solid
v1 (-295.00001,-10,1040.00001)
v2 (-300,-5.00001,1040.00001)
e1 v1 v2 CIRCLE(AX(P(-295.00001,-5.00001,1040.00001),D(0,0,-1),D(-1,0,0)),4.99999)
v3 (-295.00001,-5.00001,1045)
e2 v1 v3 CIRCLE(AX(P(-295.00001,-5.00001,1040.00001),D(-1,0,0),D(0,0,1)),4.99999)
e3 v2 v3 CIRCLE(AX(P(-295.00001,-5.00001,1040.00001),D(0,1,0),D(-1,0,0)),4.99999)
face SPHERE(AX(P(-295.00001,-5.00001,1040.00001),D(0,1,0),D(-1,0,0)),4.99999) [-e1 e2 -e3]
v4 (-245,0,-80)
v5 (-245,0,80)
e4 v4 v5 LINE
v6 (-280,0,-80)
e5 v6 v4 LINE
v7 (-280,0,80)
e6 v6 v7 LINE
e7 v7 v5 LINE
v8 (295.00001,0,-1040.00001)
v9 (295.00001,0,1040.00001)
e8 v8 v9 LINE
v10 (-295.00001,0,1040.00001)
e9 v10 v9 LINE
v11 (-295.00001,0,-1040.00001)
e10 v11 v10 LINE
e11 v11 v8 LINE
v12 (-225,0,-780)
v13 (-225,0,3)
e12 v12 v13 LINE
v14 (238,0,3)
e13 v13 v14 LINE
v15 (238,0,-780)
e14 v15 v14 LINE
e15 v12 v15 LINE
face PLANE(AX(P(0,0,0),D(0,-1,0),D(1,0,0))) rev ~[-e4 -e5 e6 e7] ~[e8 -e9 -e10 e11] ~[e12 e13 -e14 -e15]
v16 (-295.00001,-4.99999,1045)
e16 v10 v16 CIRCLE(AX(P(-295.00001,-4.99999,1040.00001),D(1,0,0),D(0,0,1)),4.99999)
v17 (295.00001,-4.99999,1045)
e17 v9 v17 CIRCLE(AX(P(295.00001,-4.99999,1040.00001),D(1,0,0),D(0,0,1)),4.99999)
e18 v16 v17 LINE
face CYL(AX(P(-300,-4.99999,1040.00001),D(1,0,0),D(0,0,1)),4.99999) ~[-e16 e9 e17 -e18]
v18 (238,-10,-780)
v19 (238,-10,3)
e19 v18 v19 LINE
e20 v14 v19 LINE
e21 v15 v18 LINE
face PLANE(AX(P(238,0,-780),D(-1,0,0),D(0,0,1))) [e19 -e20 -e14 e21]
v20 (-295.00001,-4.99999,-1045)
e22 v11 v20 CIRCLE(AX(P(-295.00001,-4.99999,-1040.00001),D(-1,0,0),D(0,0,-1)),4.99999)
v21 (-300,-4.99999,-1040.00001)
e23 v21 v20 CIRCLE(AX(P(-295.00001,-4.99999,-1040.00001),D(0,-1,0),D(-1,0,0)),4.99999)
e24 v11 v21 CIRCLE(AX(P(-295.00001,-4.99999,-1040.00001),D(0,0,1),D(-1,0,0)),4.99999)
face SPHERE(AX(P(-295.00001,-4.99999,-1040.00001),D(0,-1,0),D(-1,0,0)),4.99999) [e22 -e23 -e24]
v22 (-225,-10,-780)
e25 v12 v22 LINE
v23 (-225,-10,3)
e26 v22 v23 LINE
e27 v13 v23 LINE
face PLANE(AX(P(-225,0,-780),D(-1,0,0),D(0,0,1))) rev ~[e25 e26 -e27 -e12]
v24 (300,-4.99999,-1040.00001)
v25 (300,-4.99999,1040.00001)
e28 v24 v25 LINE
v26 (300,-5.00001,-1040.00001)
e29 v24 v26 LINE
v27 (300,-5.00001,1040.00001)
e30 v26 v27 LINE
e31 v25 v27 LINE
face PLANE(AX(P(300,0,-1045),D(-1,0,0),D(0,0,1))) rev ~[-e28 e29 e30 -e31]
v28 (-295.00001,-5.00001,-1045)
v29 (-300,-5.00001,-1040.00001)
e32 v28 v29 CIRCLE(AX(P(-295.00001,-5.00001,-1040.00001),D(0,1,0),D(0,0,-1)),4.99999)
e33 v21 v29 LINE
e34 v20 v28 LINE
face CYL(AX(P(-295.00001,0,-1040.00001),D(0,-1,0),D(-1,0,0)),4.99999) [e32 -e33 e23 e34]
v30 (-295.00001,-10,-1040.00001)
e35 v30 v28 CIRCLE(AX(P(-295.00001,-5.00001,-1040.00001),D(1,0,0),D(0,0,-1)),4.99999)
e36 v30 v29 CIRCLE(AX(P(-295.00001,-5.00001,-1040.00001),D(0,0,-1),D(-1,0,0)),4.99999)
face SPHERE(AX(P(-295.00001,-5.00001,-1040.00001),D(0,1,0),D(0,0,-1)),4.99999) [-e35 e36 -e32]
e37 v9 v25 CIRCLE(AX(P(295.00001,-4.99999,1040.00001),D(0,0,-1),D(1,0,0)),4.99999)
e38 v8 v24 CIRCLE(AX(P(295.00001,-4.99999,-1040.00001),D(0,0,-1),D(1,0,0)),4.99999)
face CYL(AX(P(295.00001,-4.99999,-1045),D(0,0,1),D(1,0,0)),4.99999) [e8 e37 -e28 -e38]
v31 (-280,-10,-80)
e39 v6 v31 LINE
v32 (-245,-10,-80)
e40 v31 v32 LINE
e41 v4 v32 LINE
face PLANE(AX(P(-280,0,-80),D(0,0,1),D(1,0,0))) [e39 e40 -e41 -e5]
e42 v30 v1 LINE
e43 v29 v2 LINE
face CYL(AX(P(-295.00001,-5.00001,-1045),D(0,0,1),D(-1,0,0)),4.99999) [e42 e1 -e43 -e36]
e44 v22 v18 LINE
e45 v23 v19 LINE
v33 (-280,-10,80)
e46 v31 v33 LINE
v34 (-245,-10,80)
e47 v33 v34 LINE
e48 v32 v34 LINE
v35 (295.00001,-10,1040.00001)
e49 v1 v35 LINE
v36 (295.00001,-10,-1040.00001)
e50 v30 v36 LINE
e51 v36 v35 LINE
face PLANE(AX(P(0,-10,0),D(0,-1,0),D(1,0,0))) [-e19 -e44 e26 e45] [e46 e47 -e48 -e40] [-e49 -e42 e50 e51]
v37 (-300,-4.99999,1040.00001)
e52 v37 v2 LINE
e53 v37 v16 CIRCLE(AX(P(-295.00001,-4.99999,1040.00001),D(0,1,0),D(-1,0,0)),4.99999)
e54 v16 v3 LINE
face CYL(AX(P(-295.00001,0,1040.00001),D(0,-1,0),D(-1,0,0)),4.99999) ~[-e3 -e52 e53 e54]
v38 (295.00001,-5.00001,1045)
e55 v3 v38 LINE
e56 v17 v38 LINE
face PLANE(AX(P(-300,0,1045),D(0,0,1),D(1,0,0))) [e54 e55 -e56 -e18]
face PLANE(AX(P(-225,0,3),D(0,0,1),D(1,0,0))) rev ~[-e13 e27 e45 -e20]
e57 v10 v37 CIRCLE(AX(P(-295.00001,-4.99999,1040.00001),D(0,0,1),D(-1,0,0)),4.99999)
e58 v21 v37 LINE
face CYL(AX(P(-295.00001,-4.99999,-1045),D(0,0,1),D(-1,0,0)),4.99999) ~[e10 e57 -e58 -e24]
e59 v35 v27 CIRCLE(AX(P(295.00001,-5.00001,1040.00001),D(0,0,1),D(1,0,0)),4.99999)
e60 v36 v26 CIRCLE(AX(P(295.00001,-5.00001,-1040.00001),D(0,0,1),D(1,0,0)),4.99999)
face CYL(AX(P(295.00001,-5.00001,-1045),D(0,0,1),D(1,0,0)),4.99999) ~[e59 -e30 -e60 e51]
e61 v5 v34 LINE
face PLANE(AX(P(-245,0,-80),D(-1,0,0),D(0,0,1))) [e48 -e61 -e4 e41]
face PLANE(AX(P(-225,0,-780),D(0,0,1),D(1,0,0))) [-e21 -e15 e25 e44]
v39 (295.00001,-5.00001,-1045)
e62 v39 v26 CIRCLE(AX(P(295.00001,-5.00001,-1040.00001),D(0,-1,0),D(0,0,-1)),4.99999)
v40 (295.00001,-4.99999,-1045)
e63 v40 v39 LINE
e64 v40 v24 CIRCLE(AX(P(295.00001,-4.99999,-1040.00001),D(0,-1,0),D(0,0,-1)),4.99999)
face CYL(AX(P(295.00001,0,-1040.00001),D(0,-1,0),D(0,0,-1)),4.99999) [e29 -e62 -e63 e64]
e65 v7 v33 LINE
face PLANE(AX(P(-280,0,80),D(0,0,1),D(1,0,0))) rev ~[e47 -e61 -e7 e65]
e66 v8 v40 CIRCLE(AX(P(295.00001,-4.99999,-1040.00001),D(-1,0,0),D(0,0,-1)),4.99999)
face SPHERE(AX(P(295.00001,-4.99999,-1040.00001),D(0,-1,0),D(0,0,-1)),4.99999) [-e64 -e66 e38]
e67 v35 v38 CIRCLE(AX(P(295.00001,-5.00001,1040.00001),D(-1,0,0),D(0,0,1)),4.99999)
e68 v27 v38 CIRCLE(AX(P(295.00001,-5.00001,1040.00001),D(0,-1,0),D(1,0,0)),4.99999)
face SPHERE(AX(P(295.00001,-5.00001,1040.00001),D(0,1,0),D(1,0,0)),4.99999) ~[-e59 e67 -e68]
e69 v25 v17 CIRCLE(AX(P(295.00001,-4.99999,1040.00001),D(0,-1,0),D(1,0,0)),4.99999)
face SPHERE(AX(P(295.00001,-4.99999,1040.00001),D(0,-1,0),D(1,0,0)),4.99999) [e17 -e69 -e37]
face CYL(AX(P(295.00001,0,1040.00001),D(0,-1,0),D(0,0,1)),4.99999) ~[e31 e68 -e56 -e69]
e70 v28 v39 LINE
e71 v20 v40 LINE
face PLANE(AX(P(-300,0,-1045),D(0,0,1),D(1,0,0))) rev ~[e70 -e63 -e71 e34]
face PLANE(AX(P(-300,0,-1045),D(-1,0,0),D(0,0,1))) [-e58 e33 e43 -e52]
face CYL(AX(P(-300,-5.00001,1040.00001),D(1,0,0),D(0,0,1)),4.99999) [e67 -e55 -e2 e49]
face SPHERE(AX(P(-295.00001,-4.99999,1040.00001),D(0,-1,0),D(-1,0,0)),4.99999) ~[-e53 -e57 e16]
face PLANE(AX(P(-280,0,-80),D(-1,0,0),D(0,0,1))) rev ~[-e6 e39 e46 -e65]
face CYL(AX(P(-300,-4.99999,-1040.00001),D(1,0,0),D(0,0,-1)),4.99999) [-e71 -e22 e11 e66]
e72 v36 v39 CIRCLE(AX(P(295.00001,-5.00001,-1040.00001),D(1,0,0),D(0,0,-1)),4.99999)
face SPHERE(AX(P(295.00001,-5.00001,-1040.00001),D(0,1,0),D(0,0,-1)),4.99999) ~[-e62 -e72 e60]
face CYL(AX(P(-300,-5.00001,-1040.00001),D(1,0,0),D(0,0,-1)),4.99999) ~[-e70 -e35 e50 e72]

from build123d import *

# Parameters (mm, degrees)
F0_W     = 600
F0_H     = 2090
F0_W_2   = 463
F0_H_2   = 783
F0_W_3   = 35
F0_H_3   = 160
F1_DEPTH = 10
F2_R     = 4.99999


# Not quite as in the source:
# - a fillet or chamfer is up to 0.001 mm smaller than in the source, because OpenCascade refuses the exact size


with BuildPart() as f1:
    # F0 (on Front) → F1 (new body)
    with BuildSketch(Plane.XZ):
        Rectangle(F0_W, F0_H)
        with Locations((6.5, -388.5)):
            Rectangle(F0_W_2, F0_H_2, mode=Mode.SUBTRACT)
        with Locations((-262.5, 0)):
            Rectangle(F0_W_3, F0_H_3, mode=Mode.SUBTRACT)
    extrude(amount=F1_DEPTH)

    # F2 (radius 5 in the source; OpenCascade refuses exactly that, so slightly less here)
    f2_edges = [f1.edges().sort_by_distance(p)[0] for p in [
        (300, -5, 1045),
        (-300, -5, 1045),
        (-300, -5, -1045),
        (300, -5, -1045),
        (0, -10, -1045),
        (-300, -10, 0),
        (-300, 0, 0),
        (0, 0, -1045),
        (300, 0, 0),
        (300, -10, 0),
        (0, -10, 1045),
        (0, 0, 1045),
    ]]
    fillet(f2_edges, radius=F2_R)


solid = f1.part
